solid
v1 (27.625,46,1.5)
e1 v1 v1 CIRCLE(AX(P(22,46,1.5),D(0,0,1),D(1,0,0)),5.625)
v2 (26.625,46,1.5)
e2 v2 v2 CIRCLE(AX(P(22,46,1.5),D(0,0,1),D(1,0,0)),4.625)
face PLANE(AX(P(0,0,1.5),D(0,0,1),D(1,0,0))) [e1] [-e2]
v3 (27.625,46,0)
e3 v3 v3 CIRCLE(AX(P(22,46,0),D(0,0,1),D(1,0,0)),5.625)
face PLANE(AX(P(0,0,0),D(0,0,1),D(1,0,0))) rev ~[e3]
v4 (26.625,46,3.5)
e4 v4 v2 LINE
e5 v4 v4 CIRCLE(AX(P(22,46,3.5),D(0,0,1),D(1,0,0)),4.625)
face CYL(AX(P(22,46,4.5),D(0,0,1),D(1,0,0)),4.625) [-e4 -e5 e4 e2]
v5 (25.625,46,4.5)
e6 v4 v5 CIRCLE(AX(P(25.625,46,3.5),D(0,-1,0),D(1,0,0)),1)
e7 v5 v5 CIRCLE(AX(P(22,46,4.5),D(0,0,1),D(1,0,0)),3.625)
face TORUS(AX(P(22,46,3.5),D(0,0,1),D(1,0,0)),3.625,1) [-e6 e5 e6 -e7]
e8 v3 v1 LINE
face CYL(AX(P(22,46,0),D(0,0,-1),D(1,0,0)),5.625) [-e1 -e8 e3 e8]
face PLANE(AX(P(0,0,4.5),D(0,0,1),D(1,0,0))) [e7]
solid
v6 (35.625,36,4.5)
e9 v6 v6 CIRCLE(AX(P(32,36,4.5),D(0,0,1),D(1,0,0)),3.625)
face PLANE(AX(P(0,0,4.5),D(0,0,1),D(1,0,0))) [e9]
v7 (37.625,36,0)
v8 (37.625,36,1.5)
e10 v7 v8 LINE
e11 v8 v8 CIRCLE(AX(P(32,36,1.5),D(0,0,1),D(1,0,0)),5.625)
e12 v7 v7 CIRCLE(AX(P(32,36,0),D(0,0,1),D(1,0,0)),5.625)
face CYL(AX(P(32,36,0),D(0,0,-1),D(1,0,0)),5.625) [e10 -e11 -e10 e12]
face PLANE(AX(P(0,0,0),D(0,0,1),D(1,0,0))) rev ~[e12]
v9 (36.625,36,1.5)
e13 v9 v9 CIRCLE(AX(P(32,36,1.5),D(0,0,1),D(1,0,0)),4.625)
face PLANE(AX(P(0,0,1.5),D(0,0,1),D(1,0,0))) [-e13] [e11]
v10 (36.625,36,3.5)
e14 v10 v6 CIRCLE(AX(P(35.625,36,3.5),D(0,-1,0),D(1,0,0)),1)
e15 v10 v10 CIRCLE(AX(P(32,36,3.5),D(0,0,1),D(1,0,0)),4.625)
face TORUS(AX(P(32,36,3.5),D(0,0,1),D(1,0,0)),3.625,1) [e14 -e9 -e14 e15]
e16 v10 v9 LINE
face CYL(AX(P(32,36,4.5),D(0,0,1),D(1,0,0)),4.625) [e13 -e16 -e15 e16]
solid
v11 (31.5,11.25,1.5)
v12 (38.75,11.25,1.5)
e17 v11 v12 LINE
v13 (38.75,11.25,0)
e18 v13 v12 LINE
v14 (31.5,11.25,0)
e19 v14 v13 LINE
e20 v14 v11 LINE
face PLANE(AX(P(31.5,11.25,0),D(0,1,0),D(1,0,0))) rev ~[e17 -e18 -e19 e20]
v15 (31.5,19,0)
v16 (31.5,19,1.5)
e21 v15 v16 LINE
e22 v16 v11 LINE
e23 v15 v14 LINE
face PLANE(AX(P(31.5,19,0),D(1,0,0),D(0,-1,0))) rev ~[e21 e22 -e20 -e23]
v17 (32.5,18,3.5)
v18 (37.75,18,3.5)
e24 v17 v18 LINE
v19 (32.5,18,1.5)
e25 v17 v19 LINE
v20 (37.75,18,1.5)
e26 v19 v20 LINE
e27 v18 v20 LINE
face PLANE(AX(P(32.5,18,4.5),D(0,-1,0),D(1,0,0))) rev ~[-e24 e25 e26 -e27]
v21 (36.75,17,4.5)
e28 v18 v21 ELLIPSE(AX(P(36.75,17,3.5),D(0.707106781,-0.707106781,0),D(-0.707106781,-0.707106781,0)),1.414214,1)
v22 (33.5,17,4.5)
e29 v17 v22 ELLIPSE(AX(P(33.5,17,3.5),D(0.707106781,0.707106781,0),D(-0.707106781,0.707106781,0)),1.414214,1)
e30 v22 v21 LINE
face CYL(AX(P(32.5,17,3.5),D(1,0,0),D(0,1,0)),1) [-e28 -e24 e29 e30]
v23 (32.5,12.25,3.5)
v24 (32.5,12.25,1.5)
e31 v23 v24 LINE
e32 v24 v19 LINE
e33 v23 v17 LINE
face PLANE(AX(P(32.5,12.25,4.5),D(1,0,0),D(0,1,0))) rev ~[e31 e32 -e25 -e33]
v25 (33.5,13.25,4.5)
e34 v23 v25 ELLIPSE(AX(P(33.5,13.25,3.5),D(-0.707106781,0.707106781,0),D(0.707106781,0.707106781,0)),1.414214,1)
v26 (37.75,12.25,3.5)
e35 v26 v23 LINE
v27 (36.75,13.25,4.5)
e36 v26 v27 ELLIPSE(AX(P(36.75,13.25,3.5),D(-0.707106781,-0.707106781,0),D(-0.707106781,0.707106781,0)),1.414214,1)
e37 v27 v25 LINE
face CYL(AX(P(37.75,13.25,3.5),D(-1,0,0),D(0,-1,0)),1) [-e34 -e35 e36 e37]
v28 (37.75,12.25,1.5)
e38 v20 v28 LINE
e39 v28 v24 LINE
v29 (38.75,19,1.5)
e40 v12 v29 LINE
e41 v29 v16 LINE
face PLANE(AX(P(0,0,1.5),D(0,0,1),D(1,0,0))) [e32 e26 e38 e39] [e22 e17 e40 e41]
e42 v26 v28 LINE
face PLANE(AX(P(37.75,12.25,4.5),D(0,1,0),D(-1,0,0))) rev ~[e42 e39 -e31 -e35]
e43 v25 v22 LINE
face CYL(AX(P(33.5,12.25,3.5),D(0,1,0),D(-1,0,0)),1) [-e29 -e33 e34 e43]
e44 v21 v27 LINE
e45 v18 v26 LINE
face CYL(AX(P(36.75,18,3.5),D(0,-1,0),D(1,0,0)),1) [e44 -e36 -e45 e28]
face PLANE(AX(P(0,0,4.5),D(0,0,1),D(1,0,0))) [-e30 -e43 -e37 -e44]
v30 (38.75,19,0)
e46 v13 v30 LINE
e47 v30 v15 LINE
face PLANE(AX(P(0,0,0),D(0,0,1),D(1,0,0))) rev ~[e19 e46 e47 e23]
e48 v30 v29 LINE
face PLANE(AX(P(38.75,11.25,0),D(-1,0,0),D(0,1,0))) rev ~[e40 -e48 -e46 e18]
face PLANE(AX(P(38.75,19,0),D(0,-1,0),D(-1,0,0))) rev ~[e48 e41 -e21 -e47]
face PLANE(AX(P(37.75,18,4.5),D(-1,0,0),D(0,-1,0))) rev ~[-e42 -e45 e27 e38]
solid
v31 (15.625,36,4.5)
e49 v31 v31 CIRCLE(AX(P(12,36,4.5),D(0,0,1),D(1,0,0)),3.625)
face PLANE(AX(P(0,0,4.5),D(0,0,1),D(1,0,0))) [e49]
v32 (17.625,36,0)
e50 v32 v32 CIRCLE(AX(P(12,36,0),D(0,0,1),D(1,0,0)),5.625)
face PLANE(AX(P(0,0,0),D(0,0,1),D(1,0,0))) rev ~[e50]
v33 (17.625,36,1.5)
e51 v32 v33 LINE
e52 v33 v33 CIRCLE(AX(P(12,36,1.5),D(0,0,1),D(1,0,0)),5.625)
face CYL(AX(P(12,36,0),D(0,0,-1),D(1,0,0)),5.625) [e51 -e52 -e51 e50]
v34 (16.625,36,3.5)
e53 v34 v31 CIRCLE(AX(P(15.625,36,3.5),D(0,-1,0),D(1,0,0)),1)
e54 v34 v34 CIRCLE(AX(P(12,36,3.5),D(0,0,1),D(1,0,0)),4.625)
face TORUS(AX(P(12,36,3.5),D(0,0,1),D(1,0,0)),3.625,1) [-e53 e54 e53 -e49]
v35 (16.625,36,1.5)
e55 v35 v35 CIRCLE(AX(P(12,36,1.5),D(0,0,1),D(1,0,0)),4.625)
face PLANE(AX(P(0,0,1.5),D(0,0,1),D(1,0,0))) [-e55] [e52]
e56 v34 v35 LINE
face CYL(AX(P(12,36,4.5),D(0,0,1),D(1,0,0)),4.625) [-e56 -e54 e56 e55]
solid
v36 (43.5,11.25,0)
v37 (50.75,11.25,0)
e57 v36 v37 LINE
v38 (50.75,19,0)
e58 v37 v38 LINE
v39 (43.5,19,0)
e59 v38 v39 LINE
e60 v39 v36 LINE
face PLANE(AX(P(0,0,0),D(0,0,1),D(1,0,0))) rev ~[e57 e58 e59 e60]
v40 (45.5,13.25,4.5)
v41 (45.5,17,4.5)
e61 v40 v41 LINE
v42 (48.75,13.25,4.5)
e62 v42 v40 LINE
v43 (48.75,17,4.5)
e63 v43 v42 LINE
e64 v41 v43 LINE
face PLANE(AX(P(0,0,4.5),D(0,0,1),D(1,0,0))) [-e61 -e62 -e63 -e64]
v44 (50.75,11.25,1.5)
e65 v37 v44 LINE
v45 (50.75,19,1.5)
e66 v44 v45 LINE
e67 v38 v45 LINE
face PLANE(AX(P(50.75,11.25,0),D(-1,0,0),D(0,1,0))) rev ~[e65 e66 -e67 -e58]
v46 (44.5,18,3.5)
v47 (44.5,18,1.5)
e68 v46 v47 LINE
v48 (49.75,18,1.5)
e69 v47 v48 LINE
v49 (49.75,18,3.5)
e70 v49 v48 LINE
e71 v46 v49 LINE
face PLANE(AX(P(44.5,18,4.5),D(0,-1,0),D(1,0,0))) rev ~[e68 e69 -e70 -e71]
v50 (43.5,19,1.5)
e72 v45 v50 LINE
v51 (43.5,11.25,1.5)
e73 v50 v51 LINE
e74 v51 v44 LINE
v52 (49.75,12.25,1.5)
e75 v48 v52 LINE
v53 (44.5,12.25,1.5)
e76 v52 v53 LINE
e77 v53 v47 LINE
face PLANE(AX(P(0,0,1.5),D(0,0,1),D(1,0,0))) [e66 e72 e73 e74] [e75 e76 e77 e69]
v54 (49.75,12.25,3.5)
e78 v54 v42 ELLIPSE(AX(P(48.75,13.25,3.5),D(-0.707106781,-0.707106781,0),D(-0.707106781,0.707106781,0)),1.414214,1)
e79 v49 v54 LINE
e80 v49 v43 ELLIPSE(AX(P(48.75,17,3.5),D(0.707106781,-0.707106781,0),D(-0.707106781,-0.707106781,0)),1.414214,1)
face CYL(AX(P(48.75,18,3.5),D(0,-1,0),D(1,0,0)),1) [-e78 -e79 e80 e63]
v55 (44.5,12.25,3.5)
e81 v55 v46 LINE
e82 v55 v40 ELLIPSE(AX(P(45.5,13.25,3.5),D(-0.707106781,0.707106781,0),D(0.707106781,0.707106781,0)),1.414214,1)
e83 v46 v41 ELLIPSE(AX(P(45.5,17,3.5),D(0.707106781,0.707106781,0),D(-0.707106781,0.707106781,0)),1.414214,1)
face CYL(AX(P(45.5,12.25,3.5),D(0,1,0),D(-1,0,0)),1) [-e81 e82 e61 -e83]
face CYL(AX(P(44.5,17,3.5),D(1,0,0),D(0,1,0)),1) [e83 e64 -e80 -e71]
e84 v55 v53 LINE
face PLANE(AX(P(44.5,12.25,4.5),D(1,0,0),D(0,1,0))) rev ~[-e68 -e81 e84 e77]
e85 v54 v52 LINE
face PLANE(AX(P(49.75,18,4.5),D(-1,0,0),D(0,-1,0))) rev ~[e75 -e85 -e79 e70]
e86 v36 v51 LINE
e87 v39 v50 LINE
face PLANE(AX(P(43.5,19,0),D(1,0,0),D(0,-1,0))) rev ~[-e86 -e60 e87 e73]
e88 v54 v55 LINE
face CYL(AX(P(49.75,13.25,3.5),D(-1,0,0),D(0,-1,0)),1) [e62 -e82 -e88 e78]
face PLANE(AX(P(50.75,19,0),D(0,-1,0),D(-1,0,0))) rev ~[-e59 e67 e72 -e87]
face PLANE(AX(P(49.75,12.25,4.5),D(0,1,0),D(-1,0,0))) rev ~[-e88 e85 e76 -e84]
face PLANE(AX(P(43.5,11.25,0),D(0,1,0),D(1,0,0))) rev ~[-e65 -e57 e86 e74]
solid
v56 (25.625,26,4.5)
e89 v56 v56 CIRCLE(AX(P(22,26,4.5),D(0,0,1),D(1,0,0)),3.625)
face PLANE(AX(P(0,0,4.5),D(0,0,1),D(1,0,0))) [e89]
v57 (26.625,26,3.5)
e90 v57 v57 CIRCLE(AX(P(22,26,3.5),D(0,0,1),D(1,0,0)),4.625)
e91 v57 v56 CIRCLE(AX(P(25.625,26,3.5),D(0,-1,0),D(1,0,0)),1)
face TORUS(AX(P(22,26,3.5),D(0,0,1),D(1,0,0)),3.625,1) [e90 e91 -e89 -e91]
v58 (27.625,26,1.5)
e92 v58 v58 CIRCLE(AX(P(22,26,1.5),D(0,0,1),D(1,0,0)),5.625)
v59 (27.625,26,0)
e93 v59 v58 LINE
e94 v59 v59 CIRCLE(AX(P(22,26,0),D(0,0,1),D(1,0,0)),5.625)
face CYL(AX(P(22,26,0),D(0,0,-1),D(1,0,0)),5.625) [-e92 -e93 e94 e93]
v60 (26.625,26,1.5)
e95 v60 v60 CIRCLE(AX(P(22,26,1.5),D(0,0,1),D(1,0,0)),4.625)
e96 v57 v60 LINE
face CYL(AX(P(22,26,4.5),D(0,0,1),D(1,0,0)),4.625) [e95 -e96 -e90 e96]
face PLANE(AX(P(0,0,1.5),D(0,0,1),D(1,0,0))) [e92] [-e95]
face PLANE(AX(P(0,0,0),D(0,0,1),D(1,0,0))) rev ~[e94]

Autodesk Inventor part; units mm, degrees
ref_plane "YZ Plane" through (0, 0, 0) normal (1, 0, 0) x (0, 1, 0)
ref_plane "XZ Plane" through (0, 0, 0) normal (0, 1, 0) x (-1, 0, 0)
ref_plane "XY Plane" through (0, 0, 0) normal (0, 0, 1) x (1, 0, 0)
sketch "Sketch1" plane through (0, 0, 0) normal (0, 0, 1) x (1, 0, 0)
  circle A0 centre (22, 46) radius 4.5
  circle A1 centre (12, 36) radius 4.5
  circle A2 centre (22, 26) radius 4.5
  circle A3 centre (32, 36) radius 4.5
  line L0 (37.75, 18) -> (32.5, 18)
  line L1 (32.5, 18) -> (32.5, 12.25)
  line L2 (32.5, 12.25) -> (37.75, 12.25)
  line L3 (37.75, 12.25) -> (37.75, 18)
  line L4 (44.5, 18) -> (49.75, 18)
  line L5 (49.75, 18) -> (49.75, 12.25)
  line L6 (49.75, 12.25) -> (44.5, 12.25)
  line L7 (44.5, 12.25) -> (44.5, 18)
  circle A4 centre (12, 36) radius 5.625
  circle A5 centre (22, 46) radius 5.625
  circle A6 centre (32, 36) radius 5.625
  circle A7 centre (22, 26) radius 5.625
  line L8 (38.75, 19) -> (31.5, 19)
  line L9 (31.5, 19) -> (31.5, 11.25)
  line L10 (31.5, 11.25) -> (38.75, 11.25)
  line L11 (38.75, 11.25) -> (38.75, 19)
  line L12 (50.75, 19) -> (43.5, 19)
  line L13 (43.5, 19) -> (43.5, 11.25)
  line L14 (43.5, 11.25) -> (50.75, 11.25)
  line L15 (50.75, 11.25) -> (50.75, 19)
  point P0 (18.75, 39)
  point P1 (18.75, 32.5)
  dimension "d35" = 11.25
  dimension "d36" = 11.25
  dimension "d37" = 11.25
  dimension "d38" = 11.25
  dimension "d43" = 7.75
  dimension "d44" = 7.75
  dimension "d45" = 7.25
  dimension "d46" = 7.25
  dimension "d47" = 5.75
  dimension "d48" = 5.25
  dimension "d49" = 5.75
  dimension "d50" = 5.25
extrude "Extrusion1" add sketch "Sketch1" along normal blind 4.5 contours A0 | A1 | A2 | A3 | L3 L2 L1 L0 | L4 L5 L6 L7 | A4 | A5 | A6 | A7 | L11 L10 L9 L8 | L15 L14 L13 L12
sketch "Sketch2" plane through (0, 0, 4.5) normal (0, 0, 1) x (1, 0, 0)
  circle A0 centre (22, 46) radius 4.625
  circle A1 centre (12, 36) radius 4.625
  circle A2 centre (22, 26) radius 4.625
  circle A3 centre (32, 36) radius 4.625
  circle A4 centre (22, 46) radius 5.625
  circle A5 centre (12, 36) radius 5.625
  circle A6 centre (22, 26) radius 5.625
  circle A7 centre (32, 36) radius 5.625
  line L0 (31.5, 19) -> (31.5, 11.25) projected
  line L1 (38.75, 11.25) -> (38.75, 19) projected
  line L2 (31.5, 19) -> (38.75, 19)
  line L3 (38.75, 19) -> (38.75, 11.25)
  line L4 (38.75, 11.25) -> (31.5, 11.25)
  line L5 (31.5, 11.25) -> (31.5, 19)
  line L6 (50.75, 19) -> (43.5, 19) projected
  line L7 (43.5, 11.25) -> (50.75, 11.25) projected
  line L8 (43.5, 19) -> (50.75, 19)
  line L9 (50.75, 19) -> (50.75, 11.25)
  line L10 (50.75, 11.25) -> (43.5, 11.25)
  line L11 (43.5, 11.25) -> (43.5, 19)
  line L12 (37.75, 18) -> (32.5, 18)
  line L13 (32.5, 18) -> (32.5, 12.25)
  line L14 (32.5, 12.25) -> (37.75, 12.25)
  line L15 (37.75, 12.25) -> (37.75, 18)
  line L16 (44.5, 18) -> (49.75, 18)
  line L17 (49.75, 18) -> (49.75, 12.25)
  line L18 (49.75, 12.25) -> (44.5, 12.25)
  line L19 (44.5, 12.25) -> (44.5, 18)
  dimension "d16" = 1
  dimension "d17" = 1
  dimension "d18" = 1
  dimension "d19" = 1
  dimension "d39" = 11.25
  dimension "d40" = 11.25
  dimension "d41" = 11.25
  dimension "d42" = 11.25
  dimension "d51" = 1
  dimension "d52" = 1
extrude "Extrusion2" cut sketch "Sketch2" against normal blind 3 contours A4 | A5 | A6 | A7
fillet "Fillet2" radius 1 4 edges at (17.375, 46, 4.5) (27.375, 36, 4.5) (17.375, 26, 4.5) (7.375, 36, 4.5)
sketch "Sketch5" plane through (0, 0, 4.5) normal (0, 0, 1) x (1, 0, 0)
  line L0 (31.5, 19) -> (31.5, 11.25) projected
  line L1 (38.75, 11.25) -> (38.75, 19) projected
  line L2 (31.5, 11.25) -> (38.75, 11.25)
  line L3 (38.75, 11.25) -> (38.75, 19)
  line L4 (38.75, 19) -> (31.5, 19)
  line L5 (31.5, 19) -> (31.5, 11.25)
  line L6 (32.5, 18) -> (37.75, 18)
  line L7 (37.75, 18) -> (37.75, 12.25)
  line L8 (37.75, 12.25) -> (32.5, 12.25)
  line L9 (32.5, 12.25) -> (32.5, 18)
  line L10 (43.5, 11.25) -> (50.75, 11.25) projected
  line L11 (50.75, 11.25) -> (50.75, 19) projected
  line L12 (43.5, 11.25) -> (50.75, 11.25)
  line L13 (50.75, 11.25) -> (50.75, 19)
  line L14 (50.75, 19) -> (43.5, 19)
  line L15 (43.5, 19) -> (43.5, 11.25)
  line L16 (44.5, 18) -> (49.75, 18)
  line L17 (49.75, 18) -> (49.75, 12.25)
  line L18 (49.75, 12.25) -> (44.5, 12.25)
  line L19 (44.5, 12.25) -> (44.5, 18)
  point P0 (0, 0)
  point P1 (43.5, 19)
  dimension "d43" = 7.75
  dimension "d58" = 1
  dimension "d60" = 1
extrude "Extrusion5" cut sketch "Sketch5" against normal blind 3
fillet "Fillet5" radius 1 8 edges at (32.5, 15.125, 4.5) (35.125, 12.25, 4.5) (37.75, 15.125, 4.5) (35.125, 18, 4.5) (44.5, 15.125, 4.5) (47.125, 12.25, 4.5) (49.75, 15.125, 4.5) (47.125, 18, 4.5)
properties part number "Groboy Buttons shorty"
